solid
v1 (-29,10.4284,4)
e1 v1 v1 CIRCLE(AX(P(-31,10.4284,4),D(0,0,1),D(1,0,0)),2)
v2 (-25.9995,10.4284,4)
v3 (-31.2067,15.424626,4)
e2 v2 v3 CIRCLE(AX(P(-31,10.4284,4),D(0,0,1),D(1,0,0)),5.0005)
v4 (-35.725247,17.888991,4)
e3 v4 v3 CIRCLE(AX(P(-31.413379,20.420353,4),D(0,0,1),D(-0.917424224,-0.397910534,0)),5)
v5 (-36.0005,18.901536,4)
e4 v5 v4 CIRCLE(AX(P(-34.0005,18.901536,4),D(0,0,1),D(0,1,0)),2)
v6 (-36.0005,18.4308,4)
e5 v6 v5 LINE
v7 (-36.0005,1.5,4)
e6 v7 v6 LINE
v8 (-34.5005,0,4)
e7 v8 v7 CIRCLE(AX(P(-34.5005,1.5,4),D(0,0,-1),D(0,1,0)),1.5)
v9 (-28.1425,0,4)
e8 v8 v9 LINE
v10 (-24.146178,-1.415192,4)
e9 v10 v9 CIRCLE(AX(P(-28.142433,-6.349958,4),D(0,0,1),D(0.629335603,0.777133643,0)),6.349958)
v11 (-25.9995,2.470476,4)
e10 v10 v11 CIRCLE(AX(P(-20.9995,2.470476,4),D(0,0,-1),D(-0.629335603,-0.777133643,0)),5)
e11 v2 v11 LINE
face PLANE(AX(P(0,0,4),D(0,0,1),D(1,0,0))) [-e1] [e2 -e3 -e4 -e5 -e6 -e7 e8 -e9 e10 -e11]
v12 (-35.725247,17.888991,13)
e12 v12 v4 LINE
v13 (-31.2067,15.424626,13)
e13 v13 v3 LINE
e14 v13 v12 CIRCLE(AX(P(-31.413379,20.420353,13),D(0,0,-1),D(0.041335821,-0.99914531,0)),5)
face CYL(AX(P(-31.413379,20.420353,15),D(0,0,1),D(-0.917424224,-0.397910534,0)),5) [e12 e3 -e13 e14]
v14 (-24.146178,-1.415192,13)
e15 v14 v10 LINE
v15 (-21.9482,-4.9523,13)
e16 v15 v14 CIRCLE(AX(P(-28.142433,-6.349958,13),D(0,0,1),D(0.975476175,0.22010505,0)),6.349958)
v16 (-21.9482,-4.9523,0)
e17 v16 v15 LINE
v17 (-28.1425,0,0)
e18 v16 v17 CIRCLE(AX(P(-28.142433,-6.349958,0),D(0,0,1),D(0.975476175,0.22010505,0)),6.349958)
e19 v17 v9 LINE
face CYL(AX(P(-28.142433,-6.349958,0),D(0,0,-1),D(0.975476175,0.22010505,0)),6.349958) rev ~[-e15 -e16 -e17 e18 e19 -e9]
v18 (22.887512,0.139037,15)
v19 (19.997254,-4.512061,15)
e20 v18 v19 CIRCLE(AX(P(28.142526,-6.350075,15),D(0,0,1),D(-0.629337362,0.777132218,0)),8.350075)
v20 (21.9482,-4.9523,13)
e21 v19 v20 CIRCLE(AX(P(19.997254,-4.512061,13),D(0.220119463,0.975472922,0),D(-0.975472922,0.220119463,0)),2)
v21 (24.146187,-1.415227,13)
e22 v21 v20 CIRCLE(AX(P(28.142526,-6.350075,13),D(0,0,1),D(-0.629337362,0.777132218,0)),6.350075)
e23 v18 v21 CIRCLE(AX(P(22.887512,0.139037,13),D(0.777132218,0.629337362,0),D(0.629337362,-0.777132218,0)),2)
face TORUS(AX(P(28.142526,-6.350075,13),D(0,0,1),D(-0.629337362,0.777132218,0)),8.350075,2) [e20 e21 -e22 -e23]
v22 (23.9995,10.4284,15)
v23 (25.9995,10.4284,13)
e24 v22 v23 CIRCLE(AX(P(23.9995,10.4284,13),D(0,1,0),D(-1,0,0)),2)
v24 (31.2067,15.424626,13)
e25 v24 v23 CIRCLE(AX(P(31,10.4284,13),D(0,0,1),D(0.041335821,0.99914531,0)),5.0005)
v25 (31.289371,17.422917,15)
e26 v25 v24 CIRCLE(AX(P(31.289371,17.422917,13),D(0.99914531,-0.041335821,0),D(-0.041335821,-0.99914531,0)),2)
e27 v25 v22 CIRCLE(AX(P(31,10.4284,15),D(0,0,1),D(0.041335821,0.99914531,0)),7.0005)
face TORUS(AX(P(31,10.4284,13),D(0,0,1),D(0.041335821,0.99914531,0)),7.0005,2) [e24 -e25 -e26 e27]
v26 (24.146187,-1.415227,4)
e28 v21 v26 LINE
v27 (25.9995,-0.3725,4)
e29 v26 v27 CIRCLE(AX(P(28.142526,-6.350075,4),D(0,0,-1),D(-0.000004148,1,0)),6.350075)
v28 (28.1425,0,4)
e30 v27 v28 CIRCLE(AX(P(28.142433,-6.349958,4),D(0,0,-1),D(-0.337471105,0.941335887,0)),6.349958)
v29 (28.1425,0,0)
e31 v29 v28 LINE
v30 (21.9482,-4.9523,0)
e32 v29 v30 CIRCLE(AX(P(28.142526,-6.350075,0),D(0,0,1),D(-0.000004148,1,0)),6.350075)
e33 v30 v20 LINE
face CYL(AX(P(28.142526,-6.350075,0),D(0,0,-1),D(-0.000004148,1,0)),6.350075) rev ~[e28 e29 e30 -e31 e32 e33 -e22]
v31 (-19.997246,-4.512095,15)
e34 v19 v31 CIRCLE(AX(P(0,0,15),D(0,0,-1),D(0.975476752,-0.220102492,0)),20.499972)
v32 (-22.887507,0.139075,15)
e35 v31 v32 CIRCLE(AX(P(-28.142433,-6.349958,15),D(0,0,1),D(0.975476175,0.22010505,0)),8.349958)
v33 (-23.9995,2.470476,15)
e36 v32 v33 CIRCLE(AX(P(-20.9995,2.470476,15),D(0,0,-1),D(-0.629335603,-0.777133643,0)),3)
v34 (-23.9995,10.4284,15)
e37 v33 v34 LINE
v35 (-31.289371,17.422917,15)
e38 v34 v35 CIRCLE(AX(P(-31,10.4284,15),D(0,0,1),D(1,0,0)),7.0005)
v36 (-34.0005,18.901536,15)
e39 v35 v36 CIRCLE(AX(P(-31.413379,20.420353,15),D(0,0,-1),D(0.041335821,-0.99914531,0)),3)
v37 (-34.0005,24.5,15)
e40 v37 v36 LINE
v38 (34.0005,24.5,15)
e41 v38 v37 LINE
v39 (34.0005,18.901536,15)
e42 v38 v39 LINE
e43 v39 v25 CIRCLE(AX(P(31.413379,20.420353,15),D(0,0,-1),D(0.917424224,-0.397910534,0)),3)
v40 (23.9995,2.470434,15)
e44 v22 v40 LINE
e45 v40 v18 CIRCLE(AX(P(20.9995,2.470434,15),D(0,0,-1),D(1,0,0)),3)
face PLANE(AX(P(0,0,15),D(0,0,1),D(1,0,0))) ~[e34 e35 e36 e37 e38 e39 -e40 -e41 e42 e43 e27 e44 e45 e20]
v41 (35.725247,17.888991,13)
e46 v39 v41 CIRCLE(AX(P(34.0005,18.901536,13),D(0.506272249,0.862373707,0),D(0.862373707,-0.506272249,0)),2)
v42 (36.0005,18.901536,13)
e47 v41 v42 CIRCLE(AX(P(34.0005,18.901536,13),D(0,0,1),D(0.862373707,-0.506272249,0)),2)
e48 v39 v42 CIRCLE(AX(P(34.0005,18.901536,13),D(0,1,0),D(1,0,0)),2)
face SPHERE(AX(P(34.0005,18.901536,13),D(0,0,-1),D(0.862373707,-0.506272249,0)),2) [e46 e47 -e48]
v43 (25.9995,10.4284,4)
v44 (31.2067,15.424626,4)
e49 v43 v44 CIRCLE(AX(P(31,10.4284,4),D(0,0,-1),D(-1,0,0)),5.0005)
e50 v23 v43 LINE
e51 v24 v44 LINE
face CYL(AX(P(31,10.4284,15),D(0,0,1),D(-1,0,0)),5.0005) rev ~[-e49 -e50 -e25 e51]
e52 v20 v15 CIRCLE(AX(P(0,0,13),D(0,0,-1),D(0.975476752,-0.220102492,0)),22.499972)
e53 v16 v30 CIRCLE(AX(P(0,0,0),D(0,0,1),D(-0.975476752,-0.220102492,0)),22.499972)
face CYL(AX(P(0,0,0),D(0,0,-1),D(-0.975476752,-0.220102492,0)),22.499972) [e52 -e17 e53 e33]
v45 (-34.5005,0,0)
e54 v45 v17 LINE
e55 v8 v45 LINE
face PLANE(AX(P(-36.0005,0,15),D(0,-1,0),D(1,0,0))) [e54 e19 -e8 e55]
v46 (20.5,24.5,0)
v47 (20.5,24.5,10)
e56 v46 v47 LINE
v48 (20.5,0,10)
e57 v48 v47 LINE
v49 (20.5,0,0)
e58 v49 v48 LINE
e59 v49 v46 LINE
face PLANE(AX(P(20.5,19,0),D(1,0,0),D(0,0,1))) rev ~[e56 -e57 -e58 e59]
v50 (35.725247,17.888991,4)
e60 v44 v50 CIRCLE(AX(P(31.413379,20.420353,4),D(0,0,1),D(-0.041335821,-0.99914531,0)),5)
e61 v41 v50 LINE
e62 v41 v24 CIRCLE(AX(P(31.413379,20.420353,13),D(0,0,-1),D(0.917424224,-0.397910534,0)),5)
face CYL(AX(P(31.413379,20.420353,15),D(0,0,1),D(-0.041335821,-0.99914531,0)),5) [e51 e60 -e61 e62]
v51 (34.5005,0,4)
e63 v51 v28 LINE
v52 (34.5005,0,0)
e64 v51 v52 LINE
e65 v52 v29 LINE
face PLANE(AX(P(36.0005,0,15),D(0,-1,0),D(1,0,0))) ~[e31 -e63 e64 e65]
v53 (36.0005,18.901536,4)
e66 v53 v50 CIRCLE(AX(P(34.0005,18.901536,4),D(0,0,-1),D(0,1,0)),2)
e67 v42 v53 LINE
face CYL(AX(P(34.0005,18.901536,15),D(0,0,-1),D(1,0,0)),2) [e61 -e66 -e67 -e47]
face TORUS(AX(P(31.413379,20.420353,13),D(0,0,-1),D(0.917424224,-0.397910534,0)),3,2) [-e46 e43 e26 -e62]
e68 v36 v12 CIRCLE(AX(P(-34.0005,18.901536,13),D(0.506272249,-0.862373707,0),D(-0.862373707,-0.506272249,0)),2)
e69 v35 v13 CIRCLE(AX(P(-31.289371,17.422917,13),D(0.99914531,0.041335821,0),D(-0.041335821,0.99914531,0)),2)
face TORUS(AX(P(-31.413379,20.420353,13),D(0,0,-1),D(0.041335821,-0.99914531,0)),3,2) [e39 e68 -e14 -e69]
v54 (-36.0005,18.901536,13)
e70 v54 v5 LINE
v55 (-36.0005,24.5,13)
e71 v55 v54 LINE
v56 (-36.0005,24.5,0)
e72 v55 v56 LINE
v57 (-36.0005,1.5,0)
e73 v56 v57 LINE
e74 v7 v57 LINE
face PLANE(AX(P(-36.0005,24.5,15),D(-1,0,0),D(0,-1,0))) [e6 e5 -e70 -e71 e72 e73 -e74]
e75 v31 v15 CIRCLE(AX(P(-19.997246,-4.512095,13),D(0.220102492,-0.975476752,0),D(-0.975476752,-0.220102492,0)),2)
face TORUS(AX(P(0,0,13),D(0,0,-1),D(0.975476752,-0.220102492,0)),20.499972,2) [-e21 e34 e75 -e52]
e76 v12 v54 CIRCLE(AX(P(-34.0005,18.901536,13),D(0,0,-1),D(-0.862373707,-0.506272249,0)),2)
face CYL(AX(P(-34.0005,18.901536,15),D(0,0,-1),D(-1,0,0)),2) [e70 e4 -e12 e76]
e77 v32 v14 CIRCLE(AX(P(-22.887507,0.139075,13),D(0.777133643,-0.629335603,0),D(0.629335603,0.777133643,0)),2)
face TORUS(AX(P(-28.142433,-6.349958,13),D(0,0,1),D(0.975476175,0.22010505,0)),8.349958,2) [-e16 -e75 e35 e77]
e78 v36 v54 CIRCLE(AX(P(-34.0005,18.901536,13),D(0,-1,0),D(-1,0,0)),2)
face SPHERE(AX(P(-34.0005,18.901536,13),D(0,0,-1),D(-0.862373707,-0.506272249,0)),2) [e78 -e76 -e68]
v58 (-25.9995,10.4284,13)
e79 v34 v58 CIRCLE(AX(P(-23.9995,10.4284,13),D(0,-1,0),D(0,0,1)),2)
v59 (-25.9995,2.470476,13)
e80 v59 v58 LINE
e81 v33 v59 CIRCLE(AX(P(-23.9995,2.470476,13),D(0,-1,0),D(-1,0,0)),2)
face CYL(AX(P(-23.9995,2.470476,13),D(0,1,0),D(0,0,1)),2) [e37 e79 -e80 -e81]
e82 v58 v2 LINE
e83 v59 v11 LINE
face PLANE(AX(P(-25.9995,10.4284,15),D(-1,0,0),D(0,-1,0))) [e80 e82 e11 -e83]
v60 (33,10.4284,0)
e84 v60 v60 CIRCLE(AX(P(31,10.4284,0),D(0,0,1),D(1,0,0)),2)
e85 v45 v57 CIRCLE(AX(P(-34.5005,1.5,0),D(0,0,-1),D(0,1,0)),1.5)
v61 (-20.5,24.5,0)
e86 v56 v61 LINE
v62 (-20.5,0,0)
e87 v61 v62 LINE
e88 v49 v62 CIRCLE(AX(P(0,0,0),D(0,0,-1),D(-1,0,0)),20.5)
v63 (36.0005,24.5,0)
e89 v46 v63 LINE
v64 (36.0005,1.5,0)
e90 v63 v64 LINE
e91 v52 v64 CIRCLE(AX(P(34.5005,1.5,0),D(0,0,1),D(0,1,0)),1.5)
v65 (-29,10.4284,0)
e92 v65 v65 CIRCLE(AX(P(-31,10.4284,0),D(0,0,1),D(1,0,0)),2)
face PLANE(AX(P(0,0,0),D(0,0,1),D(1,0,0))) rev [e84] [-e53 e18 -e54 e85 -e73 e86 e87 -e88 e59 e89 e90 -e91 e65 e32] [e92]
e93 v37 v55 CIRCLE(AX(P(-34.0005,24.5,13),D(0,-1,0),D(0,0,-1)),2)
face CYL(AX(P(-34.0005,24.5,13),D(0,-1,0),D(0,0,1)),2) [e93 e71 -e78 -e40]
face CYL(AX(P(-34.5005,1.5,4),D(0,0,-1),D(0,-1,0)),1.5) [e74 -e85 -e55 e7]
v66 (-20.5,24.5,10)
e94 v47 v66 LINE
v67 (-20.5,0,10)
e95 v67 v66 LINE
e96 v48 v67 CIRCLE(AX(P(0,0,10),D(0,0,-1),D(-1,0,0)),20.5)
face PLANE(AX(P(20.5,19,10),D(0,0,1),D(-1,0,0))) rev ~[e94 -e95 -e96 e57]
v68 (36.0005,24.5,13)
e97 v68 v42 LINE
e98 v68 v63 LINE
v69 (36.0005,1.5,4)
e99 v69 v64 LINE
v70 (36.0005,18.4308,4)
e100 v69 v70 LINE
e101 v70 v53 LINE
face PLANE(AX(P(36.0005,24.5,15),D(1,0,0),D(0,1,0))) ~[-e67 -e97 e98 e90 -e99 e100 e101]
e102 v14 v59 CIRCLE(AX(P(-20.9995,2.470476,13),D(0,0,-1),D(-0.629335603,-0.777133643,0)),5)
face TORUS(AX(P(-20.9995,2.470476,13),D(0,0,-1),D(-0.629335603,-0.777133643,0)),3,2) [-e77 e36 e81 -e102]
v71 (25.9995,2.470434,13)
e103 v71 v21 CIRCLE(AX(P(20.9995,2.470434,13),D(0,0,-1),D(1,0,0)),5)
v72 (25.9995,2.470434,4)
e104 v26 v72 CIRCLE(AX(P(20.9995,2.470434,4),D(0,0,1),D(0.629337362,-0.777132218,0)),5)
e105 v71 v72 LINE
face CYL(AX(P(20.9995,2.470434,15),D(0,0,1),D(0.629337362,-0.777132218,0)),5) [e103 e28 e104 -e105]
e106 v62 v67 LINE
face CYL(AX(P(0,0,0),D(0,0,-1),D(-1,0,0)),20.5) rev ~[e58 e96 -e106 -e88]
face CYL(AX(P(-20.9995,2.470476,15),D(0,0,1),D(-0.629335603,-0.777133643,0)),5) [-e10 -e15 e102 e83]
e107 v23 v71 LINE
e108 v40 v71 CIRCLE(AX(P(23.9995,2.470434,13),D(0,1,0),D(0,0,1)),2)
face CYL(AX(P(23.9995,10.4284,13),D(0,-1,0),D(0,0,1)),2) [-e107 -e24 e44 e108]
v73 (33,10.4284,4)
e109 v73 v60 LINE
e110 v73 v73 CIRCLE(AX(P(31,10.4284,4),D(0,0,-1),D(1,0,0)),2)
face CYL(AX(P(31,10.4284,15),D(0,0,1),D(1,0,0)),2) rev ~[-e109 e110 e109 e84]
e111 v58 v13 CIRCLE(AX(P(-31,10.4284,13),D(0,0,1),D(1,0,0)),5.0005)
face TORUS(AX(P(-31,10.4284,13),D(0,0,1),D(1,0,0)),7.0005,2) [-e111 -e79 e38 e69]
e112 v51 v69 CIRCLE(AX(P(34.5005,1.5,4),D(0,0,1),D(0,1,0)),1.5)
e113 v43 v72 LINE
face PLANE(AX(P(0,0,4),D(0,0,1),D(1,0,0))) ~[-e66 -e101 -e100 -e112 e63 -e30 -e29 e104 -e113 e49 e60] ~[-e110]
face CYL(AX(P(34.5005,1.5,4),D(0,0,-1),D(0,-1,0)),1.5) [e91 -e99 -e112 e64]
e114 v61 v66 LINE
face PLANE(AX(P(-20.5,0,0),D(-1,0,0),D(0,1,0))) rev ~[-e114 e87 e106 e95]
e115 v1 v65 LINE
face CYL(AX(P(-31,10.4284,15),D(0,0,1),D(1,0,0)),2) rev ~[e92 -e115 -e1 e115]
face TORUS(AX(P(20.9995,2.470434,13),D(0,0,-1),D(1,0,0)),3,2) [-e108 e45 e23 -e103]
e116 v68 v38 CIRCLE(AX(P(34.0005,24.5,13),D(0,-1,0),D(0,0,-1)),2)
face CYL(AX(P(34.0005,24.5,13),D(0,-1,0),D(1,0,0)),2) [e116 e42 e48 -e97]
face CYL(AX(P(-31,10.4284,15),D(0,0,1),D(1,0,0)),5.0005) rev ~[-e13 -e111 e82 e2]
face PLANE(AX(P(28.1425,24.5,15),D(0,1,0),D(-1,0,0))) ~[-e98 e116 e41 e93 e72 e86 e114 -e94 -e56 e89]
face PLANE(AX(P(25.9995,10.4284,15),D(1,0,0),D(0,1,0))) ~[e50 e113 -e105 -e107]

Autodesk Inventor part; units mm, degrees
ref_plane "YZ Plane" through (0, 0, 0) normal (1, 0, 0) x (0, 1, 0)
ref_plane "XZ Plane" through (0, 0, 0) normal (0, 1, 0) x (-1, 0, 0)
ref_plane "XY Plane" through (0, 0, 0) normal (0, 0, 1) x (1, 0, 0)
sketch "Эскиз3" plane through (0, 0, 0) normal (0, 0, 1) x (1, 0, 0)
  line L0 (36, 19) -> (-36, 19)
  line L1 (-36, 19) -> (-36, 1.5)
  arc A0 (-36, 1.5) -> (-34.5, 0) centre (-34.5, 1.5) ccw
  line L2 (-34.5, 0) -> (-28.1425, 0)
  arc A1 (-21.9482, -4.9523) -> (-28.1425, 0) centre (-28.1425, -6.35) ccw
  arc A2 (-21.9482, -4.9523) -> (21.9482, -4.9523) centre (0, 0) ccw
  arc A3 (28.1425, 0) -> (21.9482, -4.9523) centre (28.1425, -6.35) ccw
  line L3 (34.5, 0) -> (28.1425, 0)
  arc A4 (34.5, 0) -> (36, 1.5) centre (34.5, 1.5) ccw
  line L4 (36, 19) -> (36, 1.5)
  circle A5 centre (0, 0) radius 18.5
  line L5 (-28.1425, 0) -> (-28.1425, 19)
  line L6 (28.1425, 0) -> (28.1425, 19)
extrude "Выдавливание3" add sketch "Эскиз3" along normal blind 15 contours L6 A3 A2 A1 L5 L0 | A5
sketch "Эскиз4" plane through (0, 0, 0) normal (0, 0, -1) x (-1, 0, 0)
  line L0 (36, 19) -> (-36, 19)
  line L1 (-36, 19) -> (-36, 1.5)
  arc A0 (-36, 1.5) -> (-34.5, 0) centre (-34.5, 1.5) ccw
  line L2 (-34.5, 0) -> (-28.1425, 0)
  arc A1 (-21.9482, -4.9523) -> (-28.1425, 0) centre (-28.1425, -6.35) ccw
  arc A2 (-21.9482, -4.9523) -> (21.9482, -4.9523) centre (0, 0) ccw
  arc A3 (28.1425, 0) -> (21.9482, -4.9523) centre (28.1425, -6.35) ccw
  line L3 (34.5, 0) -> (28.1425, 0)
  arc A4 (34.5, 0) -> (36, 1.5) centre (34.5, 1.5) ccw
  line L4 (36, 19) -> (36, 1.5)
  circle A5 centre (0, 0) radius 18.5
  line L5 (-28.1425, 0) -> (-28.1425, 19)
  line L6 (28.1425, 0) -> (28.1425, 19)
  line L7 (-18.5, 0) -> (-18.5, 19)
  line L8 (-28.1425, 19) -> (28.1425, 19) projected
  line L9 (18.5, 0) -> (18.5, 19)
extrude "Выдавливание4" cut sketch "Эскиз4" against normal blind 10 contours L9 A5 L7 L0 | A5
offset faces "Размер1" outward -2 faces at (18.5, 12.6667, 6.6667) (-18.44, -1.4886, 6.6667) (-18.5, 6.3333, 6.6667)
offset faces "Размер2" outward 5.5 faces at (6.8333, 19, 13.3333)
sketch "Эскиз6" plane through (0, 0, 15) normal (0, 0, 1) x (1, 0, 0)
  line L0 (-28.1425, 24.5) -> (-36.0005, 24.5)
  line L1 (-36.0005, 24.5) -> (-36.0005, 0)
  line L2 (-36.0005, 0) -> (-28.1425, 0)
  line L3 (-28.1425, 0) -> (-28.1425, 24.5)
  point P0 (0, 0)
  dimension "d13" = 7.858
extrude "Выдавливание6" add sketch "Эскиз6" against normal up to surface (15 mm away)
mirror "Зеркальное отражение1" about plane through (0, 0, 0) normal (1, 0, 0) of "Выдавливание6"
sketch "Эскиз5" plane through (0, 0, 15) normal (0, 0, 1) x (1, 0, 0)
  circle A0 centre (-31, 10.4284) radius 2 projected
  circle A1 centre (31, 10.4284) radius 2 projected
  point P0 (0, 0)
extrude "Выдавливание5" cut sketch "Эскиз5" against normal through all
sketch "Эскиз7" plane through (0, 0, 15) normal (0, 0, 1) x (1, 0, 0)
  circle A0 centre (-31, 10.4284) radius 2 projected
  circle A1 centre (-31, 10.4284) radius 5.0005
  line L0 (-36.0005, 24.5) -> (-36.0005, 0) projected
  circle A2 centre (31, 10.4284) radius 2 projected
  circle A3 centre (31, 10.4284) radius 5.0005
  line L1 (36.0005, 24.5) -> (36.0005, 0) projected
  arc A4 (-36.0005, 18.4308) -> (-33.5949, 14.7029) centre (-27.8544, 21.0474) ccw
  line L2 (-31, 10.4284) -> (-36.0005, 10.4284) construction
  line L3 (-25.9995, 10.4284) -> (-25.9995, -0.3725)
  arc A5 (-21.9482, -4.9523) -> (-28.1425, 0) centre (-28.1425, -6.35) ccw projected
  line L4 (-36.0005, 0) -> (-28.1425, 0) projected
  point P0 (0, 0)
  point P1 (-33.5949, 6.1538)
  point P2 (-36.0005, 2.4259)
extrude "Выдавливание7" cut sketch "Эскиз7" against normal blind 11 contours A1 | L3 A5 L4 L0 A1 | A1 L0 A4
mirror "Зеркальное отражение2" about plane through (0, 0, 0) normal (1, 0, 0) of "Выдавливание7"
fillet "Сопряжение6" radius 5 4 edges at (-33.5949, 14.7029, 9.5) (33.5949, 14.7029, 9.5) (25.9995, -0.3725, 9.5) (-25.9995, -0.3725, 9.5)
fillet "Сопряжение7" radius 1.5 2 edges at (-36.0005, 0, 2) (36.0005, 0, 2)
fillet "Сопряжение8" radius 2 13 edges at (-27.538, 14.0366, 15) (-25.9995, 6.4494, 15) (-25.5125, 0.3179, 15) (-22.749, -2.9985, 15) (0, -22.5, 15) (22.749, -2.9985, 15) (25.5125, 0.3179, 15) (25.9995, 6.4494, 15) (27.538, 14.0366, 15) (-36.0005, 21.4654, 15) (36.0005, 21.4654, 15) (36.0005, 18.4308, 9.5) (-36.0005, 18.4308, 9.5)
properties part number "000.002.002 - Крышка мотора задняя"
